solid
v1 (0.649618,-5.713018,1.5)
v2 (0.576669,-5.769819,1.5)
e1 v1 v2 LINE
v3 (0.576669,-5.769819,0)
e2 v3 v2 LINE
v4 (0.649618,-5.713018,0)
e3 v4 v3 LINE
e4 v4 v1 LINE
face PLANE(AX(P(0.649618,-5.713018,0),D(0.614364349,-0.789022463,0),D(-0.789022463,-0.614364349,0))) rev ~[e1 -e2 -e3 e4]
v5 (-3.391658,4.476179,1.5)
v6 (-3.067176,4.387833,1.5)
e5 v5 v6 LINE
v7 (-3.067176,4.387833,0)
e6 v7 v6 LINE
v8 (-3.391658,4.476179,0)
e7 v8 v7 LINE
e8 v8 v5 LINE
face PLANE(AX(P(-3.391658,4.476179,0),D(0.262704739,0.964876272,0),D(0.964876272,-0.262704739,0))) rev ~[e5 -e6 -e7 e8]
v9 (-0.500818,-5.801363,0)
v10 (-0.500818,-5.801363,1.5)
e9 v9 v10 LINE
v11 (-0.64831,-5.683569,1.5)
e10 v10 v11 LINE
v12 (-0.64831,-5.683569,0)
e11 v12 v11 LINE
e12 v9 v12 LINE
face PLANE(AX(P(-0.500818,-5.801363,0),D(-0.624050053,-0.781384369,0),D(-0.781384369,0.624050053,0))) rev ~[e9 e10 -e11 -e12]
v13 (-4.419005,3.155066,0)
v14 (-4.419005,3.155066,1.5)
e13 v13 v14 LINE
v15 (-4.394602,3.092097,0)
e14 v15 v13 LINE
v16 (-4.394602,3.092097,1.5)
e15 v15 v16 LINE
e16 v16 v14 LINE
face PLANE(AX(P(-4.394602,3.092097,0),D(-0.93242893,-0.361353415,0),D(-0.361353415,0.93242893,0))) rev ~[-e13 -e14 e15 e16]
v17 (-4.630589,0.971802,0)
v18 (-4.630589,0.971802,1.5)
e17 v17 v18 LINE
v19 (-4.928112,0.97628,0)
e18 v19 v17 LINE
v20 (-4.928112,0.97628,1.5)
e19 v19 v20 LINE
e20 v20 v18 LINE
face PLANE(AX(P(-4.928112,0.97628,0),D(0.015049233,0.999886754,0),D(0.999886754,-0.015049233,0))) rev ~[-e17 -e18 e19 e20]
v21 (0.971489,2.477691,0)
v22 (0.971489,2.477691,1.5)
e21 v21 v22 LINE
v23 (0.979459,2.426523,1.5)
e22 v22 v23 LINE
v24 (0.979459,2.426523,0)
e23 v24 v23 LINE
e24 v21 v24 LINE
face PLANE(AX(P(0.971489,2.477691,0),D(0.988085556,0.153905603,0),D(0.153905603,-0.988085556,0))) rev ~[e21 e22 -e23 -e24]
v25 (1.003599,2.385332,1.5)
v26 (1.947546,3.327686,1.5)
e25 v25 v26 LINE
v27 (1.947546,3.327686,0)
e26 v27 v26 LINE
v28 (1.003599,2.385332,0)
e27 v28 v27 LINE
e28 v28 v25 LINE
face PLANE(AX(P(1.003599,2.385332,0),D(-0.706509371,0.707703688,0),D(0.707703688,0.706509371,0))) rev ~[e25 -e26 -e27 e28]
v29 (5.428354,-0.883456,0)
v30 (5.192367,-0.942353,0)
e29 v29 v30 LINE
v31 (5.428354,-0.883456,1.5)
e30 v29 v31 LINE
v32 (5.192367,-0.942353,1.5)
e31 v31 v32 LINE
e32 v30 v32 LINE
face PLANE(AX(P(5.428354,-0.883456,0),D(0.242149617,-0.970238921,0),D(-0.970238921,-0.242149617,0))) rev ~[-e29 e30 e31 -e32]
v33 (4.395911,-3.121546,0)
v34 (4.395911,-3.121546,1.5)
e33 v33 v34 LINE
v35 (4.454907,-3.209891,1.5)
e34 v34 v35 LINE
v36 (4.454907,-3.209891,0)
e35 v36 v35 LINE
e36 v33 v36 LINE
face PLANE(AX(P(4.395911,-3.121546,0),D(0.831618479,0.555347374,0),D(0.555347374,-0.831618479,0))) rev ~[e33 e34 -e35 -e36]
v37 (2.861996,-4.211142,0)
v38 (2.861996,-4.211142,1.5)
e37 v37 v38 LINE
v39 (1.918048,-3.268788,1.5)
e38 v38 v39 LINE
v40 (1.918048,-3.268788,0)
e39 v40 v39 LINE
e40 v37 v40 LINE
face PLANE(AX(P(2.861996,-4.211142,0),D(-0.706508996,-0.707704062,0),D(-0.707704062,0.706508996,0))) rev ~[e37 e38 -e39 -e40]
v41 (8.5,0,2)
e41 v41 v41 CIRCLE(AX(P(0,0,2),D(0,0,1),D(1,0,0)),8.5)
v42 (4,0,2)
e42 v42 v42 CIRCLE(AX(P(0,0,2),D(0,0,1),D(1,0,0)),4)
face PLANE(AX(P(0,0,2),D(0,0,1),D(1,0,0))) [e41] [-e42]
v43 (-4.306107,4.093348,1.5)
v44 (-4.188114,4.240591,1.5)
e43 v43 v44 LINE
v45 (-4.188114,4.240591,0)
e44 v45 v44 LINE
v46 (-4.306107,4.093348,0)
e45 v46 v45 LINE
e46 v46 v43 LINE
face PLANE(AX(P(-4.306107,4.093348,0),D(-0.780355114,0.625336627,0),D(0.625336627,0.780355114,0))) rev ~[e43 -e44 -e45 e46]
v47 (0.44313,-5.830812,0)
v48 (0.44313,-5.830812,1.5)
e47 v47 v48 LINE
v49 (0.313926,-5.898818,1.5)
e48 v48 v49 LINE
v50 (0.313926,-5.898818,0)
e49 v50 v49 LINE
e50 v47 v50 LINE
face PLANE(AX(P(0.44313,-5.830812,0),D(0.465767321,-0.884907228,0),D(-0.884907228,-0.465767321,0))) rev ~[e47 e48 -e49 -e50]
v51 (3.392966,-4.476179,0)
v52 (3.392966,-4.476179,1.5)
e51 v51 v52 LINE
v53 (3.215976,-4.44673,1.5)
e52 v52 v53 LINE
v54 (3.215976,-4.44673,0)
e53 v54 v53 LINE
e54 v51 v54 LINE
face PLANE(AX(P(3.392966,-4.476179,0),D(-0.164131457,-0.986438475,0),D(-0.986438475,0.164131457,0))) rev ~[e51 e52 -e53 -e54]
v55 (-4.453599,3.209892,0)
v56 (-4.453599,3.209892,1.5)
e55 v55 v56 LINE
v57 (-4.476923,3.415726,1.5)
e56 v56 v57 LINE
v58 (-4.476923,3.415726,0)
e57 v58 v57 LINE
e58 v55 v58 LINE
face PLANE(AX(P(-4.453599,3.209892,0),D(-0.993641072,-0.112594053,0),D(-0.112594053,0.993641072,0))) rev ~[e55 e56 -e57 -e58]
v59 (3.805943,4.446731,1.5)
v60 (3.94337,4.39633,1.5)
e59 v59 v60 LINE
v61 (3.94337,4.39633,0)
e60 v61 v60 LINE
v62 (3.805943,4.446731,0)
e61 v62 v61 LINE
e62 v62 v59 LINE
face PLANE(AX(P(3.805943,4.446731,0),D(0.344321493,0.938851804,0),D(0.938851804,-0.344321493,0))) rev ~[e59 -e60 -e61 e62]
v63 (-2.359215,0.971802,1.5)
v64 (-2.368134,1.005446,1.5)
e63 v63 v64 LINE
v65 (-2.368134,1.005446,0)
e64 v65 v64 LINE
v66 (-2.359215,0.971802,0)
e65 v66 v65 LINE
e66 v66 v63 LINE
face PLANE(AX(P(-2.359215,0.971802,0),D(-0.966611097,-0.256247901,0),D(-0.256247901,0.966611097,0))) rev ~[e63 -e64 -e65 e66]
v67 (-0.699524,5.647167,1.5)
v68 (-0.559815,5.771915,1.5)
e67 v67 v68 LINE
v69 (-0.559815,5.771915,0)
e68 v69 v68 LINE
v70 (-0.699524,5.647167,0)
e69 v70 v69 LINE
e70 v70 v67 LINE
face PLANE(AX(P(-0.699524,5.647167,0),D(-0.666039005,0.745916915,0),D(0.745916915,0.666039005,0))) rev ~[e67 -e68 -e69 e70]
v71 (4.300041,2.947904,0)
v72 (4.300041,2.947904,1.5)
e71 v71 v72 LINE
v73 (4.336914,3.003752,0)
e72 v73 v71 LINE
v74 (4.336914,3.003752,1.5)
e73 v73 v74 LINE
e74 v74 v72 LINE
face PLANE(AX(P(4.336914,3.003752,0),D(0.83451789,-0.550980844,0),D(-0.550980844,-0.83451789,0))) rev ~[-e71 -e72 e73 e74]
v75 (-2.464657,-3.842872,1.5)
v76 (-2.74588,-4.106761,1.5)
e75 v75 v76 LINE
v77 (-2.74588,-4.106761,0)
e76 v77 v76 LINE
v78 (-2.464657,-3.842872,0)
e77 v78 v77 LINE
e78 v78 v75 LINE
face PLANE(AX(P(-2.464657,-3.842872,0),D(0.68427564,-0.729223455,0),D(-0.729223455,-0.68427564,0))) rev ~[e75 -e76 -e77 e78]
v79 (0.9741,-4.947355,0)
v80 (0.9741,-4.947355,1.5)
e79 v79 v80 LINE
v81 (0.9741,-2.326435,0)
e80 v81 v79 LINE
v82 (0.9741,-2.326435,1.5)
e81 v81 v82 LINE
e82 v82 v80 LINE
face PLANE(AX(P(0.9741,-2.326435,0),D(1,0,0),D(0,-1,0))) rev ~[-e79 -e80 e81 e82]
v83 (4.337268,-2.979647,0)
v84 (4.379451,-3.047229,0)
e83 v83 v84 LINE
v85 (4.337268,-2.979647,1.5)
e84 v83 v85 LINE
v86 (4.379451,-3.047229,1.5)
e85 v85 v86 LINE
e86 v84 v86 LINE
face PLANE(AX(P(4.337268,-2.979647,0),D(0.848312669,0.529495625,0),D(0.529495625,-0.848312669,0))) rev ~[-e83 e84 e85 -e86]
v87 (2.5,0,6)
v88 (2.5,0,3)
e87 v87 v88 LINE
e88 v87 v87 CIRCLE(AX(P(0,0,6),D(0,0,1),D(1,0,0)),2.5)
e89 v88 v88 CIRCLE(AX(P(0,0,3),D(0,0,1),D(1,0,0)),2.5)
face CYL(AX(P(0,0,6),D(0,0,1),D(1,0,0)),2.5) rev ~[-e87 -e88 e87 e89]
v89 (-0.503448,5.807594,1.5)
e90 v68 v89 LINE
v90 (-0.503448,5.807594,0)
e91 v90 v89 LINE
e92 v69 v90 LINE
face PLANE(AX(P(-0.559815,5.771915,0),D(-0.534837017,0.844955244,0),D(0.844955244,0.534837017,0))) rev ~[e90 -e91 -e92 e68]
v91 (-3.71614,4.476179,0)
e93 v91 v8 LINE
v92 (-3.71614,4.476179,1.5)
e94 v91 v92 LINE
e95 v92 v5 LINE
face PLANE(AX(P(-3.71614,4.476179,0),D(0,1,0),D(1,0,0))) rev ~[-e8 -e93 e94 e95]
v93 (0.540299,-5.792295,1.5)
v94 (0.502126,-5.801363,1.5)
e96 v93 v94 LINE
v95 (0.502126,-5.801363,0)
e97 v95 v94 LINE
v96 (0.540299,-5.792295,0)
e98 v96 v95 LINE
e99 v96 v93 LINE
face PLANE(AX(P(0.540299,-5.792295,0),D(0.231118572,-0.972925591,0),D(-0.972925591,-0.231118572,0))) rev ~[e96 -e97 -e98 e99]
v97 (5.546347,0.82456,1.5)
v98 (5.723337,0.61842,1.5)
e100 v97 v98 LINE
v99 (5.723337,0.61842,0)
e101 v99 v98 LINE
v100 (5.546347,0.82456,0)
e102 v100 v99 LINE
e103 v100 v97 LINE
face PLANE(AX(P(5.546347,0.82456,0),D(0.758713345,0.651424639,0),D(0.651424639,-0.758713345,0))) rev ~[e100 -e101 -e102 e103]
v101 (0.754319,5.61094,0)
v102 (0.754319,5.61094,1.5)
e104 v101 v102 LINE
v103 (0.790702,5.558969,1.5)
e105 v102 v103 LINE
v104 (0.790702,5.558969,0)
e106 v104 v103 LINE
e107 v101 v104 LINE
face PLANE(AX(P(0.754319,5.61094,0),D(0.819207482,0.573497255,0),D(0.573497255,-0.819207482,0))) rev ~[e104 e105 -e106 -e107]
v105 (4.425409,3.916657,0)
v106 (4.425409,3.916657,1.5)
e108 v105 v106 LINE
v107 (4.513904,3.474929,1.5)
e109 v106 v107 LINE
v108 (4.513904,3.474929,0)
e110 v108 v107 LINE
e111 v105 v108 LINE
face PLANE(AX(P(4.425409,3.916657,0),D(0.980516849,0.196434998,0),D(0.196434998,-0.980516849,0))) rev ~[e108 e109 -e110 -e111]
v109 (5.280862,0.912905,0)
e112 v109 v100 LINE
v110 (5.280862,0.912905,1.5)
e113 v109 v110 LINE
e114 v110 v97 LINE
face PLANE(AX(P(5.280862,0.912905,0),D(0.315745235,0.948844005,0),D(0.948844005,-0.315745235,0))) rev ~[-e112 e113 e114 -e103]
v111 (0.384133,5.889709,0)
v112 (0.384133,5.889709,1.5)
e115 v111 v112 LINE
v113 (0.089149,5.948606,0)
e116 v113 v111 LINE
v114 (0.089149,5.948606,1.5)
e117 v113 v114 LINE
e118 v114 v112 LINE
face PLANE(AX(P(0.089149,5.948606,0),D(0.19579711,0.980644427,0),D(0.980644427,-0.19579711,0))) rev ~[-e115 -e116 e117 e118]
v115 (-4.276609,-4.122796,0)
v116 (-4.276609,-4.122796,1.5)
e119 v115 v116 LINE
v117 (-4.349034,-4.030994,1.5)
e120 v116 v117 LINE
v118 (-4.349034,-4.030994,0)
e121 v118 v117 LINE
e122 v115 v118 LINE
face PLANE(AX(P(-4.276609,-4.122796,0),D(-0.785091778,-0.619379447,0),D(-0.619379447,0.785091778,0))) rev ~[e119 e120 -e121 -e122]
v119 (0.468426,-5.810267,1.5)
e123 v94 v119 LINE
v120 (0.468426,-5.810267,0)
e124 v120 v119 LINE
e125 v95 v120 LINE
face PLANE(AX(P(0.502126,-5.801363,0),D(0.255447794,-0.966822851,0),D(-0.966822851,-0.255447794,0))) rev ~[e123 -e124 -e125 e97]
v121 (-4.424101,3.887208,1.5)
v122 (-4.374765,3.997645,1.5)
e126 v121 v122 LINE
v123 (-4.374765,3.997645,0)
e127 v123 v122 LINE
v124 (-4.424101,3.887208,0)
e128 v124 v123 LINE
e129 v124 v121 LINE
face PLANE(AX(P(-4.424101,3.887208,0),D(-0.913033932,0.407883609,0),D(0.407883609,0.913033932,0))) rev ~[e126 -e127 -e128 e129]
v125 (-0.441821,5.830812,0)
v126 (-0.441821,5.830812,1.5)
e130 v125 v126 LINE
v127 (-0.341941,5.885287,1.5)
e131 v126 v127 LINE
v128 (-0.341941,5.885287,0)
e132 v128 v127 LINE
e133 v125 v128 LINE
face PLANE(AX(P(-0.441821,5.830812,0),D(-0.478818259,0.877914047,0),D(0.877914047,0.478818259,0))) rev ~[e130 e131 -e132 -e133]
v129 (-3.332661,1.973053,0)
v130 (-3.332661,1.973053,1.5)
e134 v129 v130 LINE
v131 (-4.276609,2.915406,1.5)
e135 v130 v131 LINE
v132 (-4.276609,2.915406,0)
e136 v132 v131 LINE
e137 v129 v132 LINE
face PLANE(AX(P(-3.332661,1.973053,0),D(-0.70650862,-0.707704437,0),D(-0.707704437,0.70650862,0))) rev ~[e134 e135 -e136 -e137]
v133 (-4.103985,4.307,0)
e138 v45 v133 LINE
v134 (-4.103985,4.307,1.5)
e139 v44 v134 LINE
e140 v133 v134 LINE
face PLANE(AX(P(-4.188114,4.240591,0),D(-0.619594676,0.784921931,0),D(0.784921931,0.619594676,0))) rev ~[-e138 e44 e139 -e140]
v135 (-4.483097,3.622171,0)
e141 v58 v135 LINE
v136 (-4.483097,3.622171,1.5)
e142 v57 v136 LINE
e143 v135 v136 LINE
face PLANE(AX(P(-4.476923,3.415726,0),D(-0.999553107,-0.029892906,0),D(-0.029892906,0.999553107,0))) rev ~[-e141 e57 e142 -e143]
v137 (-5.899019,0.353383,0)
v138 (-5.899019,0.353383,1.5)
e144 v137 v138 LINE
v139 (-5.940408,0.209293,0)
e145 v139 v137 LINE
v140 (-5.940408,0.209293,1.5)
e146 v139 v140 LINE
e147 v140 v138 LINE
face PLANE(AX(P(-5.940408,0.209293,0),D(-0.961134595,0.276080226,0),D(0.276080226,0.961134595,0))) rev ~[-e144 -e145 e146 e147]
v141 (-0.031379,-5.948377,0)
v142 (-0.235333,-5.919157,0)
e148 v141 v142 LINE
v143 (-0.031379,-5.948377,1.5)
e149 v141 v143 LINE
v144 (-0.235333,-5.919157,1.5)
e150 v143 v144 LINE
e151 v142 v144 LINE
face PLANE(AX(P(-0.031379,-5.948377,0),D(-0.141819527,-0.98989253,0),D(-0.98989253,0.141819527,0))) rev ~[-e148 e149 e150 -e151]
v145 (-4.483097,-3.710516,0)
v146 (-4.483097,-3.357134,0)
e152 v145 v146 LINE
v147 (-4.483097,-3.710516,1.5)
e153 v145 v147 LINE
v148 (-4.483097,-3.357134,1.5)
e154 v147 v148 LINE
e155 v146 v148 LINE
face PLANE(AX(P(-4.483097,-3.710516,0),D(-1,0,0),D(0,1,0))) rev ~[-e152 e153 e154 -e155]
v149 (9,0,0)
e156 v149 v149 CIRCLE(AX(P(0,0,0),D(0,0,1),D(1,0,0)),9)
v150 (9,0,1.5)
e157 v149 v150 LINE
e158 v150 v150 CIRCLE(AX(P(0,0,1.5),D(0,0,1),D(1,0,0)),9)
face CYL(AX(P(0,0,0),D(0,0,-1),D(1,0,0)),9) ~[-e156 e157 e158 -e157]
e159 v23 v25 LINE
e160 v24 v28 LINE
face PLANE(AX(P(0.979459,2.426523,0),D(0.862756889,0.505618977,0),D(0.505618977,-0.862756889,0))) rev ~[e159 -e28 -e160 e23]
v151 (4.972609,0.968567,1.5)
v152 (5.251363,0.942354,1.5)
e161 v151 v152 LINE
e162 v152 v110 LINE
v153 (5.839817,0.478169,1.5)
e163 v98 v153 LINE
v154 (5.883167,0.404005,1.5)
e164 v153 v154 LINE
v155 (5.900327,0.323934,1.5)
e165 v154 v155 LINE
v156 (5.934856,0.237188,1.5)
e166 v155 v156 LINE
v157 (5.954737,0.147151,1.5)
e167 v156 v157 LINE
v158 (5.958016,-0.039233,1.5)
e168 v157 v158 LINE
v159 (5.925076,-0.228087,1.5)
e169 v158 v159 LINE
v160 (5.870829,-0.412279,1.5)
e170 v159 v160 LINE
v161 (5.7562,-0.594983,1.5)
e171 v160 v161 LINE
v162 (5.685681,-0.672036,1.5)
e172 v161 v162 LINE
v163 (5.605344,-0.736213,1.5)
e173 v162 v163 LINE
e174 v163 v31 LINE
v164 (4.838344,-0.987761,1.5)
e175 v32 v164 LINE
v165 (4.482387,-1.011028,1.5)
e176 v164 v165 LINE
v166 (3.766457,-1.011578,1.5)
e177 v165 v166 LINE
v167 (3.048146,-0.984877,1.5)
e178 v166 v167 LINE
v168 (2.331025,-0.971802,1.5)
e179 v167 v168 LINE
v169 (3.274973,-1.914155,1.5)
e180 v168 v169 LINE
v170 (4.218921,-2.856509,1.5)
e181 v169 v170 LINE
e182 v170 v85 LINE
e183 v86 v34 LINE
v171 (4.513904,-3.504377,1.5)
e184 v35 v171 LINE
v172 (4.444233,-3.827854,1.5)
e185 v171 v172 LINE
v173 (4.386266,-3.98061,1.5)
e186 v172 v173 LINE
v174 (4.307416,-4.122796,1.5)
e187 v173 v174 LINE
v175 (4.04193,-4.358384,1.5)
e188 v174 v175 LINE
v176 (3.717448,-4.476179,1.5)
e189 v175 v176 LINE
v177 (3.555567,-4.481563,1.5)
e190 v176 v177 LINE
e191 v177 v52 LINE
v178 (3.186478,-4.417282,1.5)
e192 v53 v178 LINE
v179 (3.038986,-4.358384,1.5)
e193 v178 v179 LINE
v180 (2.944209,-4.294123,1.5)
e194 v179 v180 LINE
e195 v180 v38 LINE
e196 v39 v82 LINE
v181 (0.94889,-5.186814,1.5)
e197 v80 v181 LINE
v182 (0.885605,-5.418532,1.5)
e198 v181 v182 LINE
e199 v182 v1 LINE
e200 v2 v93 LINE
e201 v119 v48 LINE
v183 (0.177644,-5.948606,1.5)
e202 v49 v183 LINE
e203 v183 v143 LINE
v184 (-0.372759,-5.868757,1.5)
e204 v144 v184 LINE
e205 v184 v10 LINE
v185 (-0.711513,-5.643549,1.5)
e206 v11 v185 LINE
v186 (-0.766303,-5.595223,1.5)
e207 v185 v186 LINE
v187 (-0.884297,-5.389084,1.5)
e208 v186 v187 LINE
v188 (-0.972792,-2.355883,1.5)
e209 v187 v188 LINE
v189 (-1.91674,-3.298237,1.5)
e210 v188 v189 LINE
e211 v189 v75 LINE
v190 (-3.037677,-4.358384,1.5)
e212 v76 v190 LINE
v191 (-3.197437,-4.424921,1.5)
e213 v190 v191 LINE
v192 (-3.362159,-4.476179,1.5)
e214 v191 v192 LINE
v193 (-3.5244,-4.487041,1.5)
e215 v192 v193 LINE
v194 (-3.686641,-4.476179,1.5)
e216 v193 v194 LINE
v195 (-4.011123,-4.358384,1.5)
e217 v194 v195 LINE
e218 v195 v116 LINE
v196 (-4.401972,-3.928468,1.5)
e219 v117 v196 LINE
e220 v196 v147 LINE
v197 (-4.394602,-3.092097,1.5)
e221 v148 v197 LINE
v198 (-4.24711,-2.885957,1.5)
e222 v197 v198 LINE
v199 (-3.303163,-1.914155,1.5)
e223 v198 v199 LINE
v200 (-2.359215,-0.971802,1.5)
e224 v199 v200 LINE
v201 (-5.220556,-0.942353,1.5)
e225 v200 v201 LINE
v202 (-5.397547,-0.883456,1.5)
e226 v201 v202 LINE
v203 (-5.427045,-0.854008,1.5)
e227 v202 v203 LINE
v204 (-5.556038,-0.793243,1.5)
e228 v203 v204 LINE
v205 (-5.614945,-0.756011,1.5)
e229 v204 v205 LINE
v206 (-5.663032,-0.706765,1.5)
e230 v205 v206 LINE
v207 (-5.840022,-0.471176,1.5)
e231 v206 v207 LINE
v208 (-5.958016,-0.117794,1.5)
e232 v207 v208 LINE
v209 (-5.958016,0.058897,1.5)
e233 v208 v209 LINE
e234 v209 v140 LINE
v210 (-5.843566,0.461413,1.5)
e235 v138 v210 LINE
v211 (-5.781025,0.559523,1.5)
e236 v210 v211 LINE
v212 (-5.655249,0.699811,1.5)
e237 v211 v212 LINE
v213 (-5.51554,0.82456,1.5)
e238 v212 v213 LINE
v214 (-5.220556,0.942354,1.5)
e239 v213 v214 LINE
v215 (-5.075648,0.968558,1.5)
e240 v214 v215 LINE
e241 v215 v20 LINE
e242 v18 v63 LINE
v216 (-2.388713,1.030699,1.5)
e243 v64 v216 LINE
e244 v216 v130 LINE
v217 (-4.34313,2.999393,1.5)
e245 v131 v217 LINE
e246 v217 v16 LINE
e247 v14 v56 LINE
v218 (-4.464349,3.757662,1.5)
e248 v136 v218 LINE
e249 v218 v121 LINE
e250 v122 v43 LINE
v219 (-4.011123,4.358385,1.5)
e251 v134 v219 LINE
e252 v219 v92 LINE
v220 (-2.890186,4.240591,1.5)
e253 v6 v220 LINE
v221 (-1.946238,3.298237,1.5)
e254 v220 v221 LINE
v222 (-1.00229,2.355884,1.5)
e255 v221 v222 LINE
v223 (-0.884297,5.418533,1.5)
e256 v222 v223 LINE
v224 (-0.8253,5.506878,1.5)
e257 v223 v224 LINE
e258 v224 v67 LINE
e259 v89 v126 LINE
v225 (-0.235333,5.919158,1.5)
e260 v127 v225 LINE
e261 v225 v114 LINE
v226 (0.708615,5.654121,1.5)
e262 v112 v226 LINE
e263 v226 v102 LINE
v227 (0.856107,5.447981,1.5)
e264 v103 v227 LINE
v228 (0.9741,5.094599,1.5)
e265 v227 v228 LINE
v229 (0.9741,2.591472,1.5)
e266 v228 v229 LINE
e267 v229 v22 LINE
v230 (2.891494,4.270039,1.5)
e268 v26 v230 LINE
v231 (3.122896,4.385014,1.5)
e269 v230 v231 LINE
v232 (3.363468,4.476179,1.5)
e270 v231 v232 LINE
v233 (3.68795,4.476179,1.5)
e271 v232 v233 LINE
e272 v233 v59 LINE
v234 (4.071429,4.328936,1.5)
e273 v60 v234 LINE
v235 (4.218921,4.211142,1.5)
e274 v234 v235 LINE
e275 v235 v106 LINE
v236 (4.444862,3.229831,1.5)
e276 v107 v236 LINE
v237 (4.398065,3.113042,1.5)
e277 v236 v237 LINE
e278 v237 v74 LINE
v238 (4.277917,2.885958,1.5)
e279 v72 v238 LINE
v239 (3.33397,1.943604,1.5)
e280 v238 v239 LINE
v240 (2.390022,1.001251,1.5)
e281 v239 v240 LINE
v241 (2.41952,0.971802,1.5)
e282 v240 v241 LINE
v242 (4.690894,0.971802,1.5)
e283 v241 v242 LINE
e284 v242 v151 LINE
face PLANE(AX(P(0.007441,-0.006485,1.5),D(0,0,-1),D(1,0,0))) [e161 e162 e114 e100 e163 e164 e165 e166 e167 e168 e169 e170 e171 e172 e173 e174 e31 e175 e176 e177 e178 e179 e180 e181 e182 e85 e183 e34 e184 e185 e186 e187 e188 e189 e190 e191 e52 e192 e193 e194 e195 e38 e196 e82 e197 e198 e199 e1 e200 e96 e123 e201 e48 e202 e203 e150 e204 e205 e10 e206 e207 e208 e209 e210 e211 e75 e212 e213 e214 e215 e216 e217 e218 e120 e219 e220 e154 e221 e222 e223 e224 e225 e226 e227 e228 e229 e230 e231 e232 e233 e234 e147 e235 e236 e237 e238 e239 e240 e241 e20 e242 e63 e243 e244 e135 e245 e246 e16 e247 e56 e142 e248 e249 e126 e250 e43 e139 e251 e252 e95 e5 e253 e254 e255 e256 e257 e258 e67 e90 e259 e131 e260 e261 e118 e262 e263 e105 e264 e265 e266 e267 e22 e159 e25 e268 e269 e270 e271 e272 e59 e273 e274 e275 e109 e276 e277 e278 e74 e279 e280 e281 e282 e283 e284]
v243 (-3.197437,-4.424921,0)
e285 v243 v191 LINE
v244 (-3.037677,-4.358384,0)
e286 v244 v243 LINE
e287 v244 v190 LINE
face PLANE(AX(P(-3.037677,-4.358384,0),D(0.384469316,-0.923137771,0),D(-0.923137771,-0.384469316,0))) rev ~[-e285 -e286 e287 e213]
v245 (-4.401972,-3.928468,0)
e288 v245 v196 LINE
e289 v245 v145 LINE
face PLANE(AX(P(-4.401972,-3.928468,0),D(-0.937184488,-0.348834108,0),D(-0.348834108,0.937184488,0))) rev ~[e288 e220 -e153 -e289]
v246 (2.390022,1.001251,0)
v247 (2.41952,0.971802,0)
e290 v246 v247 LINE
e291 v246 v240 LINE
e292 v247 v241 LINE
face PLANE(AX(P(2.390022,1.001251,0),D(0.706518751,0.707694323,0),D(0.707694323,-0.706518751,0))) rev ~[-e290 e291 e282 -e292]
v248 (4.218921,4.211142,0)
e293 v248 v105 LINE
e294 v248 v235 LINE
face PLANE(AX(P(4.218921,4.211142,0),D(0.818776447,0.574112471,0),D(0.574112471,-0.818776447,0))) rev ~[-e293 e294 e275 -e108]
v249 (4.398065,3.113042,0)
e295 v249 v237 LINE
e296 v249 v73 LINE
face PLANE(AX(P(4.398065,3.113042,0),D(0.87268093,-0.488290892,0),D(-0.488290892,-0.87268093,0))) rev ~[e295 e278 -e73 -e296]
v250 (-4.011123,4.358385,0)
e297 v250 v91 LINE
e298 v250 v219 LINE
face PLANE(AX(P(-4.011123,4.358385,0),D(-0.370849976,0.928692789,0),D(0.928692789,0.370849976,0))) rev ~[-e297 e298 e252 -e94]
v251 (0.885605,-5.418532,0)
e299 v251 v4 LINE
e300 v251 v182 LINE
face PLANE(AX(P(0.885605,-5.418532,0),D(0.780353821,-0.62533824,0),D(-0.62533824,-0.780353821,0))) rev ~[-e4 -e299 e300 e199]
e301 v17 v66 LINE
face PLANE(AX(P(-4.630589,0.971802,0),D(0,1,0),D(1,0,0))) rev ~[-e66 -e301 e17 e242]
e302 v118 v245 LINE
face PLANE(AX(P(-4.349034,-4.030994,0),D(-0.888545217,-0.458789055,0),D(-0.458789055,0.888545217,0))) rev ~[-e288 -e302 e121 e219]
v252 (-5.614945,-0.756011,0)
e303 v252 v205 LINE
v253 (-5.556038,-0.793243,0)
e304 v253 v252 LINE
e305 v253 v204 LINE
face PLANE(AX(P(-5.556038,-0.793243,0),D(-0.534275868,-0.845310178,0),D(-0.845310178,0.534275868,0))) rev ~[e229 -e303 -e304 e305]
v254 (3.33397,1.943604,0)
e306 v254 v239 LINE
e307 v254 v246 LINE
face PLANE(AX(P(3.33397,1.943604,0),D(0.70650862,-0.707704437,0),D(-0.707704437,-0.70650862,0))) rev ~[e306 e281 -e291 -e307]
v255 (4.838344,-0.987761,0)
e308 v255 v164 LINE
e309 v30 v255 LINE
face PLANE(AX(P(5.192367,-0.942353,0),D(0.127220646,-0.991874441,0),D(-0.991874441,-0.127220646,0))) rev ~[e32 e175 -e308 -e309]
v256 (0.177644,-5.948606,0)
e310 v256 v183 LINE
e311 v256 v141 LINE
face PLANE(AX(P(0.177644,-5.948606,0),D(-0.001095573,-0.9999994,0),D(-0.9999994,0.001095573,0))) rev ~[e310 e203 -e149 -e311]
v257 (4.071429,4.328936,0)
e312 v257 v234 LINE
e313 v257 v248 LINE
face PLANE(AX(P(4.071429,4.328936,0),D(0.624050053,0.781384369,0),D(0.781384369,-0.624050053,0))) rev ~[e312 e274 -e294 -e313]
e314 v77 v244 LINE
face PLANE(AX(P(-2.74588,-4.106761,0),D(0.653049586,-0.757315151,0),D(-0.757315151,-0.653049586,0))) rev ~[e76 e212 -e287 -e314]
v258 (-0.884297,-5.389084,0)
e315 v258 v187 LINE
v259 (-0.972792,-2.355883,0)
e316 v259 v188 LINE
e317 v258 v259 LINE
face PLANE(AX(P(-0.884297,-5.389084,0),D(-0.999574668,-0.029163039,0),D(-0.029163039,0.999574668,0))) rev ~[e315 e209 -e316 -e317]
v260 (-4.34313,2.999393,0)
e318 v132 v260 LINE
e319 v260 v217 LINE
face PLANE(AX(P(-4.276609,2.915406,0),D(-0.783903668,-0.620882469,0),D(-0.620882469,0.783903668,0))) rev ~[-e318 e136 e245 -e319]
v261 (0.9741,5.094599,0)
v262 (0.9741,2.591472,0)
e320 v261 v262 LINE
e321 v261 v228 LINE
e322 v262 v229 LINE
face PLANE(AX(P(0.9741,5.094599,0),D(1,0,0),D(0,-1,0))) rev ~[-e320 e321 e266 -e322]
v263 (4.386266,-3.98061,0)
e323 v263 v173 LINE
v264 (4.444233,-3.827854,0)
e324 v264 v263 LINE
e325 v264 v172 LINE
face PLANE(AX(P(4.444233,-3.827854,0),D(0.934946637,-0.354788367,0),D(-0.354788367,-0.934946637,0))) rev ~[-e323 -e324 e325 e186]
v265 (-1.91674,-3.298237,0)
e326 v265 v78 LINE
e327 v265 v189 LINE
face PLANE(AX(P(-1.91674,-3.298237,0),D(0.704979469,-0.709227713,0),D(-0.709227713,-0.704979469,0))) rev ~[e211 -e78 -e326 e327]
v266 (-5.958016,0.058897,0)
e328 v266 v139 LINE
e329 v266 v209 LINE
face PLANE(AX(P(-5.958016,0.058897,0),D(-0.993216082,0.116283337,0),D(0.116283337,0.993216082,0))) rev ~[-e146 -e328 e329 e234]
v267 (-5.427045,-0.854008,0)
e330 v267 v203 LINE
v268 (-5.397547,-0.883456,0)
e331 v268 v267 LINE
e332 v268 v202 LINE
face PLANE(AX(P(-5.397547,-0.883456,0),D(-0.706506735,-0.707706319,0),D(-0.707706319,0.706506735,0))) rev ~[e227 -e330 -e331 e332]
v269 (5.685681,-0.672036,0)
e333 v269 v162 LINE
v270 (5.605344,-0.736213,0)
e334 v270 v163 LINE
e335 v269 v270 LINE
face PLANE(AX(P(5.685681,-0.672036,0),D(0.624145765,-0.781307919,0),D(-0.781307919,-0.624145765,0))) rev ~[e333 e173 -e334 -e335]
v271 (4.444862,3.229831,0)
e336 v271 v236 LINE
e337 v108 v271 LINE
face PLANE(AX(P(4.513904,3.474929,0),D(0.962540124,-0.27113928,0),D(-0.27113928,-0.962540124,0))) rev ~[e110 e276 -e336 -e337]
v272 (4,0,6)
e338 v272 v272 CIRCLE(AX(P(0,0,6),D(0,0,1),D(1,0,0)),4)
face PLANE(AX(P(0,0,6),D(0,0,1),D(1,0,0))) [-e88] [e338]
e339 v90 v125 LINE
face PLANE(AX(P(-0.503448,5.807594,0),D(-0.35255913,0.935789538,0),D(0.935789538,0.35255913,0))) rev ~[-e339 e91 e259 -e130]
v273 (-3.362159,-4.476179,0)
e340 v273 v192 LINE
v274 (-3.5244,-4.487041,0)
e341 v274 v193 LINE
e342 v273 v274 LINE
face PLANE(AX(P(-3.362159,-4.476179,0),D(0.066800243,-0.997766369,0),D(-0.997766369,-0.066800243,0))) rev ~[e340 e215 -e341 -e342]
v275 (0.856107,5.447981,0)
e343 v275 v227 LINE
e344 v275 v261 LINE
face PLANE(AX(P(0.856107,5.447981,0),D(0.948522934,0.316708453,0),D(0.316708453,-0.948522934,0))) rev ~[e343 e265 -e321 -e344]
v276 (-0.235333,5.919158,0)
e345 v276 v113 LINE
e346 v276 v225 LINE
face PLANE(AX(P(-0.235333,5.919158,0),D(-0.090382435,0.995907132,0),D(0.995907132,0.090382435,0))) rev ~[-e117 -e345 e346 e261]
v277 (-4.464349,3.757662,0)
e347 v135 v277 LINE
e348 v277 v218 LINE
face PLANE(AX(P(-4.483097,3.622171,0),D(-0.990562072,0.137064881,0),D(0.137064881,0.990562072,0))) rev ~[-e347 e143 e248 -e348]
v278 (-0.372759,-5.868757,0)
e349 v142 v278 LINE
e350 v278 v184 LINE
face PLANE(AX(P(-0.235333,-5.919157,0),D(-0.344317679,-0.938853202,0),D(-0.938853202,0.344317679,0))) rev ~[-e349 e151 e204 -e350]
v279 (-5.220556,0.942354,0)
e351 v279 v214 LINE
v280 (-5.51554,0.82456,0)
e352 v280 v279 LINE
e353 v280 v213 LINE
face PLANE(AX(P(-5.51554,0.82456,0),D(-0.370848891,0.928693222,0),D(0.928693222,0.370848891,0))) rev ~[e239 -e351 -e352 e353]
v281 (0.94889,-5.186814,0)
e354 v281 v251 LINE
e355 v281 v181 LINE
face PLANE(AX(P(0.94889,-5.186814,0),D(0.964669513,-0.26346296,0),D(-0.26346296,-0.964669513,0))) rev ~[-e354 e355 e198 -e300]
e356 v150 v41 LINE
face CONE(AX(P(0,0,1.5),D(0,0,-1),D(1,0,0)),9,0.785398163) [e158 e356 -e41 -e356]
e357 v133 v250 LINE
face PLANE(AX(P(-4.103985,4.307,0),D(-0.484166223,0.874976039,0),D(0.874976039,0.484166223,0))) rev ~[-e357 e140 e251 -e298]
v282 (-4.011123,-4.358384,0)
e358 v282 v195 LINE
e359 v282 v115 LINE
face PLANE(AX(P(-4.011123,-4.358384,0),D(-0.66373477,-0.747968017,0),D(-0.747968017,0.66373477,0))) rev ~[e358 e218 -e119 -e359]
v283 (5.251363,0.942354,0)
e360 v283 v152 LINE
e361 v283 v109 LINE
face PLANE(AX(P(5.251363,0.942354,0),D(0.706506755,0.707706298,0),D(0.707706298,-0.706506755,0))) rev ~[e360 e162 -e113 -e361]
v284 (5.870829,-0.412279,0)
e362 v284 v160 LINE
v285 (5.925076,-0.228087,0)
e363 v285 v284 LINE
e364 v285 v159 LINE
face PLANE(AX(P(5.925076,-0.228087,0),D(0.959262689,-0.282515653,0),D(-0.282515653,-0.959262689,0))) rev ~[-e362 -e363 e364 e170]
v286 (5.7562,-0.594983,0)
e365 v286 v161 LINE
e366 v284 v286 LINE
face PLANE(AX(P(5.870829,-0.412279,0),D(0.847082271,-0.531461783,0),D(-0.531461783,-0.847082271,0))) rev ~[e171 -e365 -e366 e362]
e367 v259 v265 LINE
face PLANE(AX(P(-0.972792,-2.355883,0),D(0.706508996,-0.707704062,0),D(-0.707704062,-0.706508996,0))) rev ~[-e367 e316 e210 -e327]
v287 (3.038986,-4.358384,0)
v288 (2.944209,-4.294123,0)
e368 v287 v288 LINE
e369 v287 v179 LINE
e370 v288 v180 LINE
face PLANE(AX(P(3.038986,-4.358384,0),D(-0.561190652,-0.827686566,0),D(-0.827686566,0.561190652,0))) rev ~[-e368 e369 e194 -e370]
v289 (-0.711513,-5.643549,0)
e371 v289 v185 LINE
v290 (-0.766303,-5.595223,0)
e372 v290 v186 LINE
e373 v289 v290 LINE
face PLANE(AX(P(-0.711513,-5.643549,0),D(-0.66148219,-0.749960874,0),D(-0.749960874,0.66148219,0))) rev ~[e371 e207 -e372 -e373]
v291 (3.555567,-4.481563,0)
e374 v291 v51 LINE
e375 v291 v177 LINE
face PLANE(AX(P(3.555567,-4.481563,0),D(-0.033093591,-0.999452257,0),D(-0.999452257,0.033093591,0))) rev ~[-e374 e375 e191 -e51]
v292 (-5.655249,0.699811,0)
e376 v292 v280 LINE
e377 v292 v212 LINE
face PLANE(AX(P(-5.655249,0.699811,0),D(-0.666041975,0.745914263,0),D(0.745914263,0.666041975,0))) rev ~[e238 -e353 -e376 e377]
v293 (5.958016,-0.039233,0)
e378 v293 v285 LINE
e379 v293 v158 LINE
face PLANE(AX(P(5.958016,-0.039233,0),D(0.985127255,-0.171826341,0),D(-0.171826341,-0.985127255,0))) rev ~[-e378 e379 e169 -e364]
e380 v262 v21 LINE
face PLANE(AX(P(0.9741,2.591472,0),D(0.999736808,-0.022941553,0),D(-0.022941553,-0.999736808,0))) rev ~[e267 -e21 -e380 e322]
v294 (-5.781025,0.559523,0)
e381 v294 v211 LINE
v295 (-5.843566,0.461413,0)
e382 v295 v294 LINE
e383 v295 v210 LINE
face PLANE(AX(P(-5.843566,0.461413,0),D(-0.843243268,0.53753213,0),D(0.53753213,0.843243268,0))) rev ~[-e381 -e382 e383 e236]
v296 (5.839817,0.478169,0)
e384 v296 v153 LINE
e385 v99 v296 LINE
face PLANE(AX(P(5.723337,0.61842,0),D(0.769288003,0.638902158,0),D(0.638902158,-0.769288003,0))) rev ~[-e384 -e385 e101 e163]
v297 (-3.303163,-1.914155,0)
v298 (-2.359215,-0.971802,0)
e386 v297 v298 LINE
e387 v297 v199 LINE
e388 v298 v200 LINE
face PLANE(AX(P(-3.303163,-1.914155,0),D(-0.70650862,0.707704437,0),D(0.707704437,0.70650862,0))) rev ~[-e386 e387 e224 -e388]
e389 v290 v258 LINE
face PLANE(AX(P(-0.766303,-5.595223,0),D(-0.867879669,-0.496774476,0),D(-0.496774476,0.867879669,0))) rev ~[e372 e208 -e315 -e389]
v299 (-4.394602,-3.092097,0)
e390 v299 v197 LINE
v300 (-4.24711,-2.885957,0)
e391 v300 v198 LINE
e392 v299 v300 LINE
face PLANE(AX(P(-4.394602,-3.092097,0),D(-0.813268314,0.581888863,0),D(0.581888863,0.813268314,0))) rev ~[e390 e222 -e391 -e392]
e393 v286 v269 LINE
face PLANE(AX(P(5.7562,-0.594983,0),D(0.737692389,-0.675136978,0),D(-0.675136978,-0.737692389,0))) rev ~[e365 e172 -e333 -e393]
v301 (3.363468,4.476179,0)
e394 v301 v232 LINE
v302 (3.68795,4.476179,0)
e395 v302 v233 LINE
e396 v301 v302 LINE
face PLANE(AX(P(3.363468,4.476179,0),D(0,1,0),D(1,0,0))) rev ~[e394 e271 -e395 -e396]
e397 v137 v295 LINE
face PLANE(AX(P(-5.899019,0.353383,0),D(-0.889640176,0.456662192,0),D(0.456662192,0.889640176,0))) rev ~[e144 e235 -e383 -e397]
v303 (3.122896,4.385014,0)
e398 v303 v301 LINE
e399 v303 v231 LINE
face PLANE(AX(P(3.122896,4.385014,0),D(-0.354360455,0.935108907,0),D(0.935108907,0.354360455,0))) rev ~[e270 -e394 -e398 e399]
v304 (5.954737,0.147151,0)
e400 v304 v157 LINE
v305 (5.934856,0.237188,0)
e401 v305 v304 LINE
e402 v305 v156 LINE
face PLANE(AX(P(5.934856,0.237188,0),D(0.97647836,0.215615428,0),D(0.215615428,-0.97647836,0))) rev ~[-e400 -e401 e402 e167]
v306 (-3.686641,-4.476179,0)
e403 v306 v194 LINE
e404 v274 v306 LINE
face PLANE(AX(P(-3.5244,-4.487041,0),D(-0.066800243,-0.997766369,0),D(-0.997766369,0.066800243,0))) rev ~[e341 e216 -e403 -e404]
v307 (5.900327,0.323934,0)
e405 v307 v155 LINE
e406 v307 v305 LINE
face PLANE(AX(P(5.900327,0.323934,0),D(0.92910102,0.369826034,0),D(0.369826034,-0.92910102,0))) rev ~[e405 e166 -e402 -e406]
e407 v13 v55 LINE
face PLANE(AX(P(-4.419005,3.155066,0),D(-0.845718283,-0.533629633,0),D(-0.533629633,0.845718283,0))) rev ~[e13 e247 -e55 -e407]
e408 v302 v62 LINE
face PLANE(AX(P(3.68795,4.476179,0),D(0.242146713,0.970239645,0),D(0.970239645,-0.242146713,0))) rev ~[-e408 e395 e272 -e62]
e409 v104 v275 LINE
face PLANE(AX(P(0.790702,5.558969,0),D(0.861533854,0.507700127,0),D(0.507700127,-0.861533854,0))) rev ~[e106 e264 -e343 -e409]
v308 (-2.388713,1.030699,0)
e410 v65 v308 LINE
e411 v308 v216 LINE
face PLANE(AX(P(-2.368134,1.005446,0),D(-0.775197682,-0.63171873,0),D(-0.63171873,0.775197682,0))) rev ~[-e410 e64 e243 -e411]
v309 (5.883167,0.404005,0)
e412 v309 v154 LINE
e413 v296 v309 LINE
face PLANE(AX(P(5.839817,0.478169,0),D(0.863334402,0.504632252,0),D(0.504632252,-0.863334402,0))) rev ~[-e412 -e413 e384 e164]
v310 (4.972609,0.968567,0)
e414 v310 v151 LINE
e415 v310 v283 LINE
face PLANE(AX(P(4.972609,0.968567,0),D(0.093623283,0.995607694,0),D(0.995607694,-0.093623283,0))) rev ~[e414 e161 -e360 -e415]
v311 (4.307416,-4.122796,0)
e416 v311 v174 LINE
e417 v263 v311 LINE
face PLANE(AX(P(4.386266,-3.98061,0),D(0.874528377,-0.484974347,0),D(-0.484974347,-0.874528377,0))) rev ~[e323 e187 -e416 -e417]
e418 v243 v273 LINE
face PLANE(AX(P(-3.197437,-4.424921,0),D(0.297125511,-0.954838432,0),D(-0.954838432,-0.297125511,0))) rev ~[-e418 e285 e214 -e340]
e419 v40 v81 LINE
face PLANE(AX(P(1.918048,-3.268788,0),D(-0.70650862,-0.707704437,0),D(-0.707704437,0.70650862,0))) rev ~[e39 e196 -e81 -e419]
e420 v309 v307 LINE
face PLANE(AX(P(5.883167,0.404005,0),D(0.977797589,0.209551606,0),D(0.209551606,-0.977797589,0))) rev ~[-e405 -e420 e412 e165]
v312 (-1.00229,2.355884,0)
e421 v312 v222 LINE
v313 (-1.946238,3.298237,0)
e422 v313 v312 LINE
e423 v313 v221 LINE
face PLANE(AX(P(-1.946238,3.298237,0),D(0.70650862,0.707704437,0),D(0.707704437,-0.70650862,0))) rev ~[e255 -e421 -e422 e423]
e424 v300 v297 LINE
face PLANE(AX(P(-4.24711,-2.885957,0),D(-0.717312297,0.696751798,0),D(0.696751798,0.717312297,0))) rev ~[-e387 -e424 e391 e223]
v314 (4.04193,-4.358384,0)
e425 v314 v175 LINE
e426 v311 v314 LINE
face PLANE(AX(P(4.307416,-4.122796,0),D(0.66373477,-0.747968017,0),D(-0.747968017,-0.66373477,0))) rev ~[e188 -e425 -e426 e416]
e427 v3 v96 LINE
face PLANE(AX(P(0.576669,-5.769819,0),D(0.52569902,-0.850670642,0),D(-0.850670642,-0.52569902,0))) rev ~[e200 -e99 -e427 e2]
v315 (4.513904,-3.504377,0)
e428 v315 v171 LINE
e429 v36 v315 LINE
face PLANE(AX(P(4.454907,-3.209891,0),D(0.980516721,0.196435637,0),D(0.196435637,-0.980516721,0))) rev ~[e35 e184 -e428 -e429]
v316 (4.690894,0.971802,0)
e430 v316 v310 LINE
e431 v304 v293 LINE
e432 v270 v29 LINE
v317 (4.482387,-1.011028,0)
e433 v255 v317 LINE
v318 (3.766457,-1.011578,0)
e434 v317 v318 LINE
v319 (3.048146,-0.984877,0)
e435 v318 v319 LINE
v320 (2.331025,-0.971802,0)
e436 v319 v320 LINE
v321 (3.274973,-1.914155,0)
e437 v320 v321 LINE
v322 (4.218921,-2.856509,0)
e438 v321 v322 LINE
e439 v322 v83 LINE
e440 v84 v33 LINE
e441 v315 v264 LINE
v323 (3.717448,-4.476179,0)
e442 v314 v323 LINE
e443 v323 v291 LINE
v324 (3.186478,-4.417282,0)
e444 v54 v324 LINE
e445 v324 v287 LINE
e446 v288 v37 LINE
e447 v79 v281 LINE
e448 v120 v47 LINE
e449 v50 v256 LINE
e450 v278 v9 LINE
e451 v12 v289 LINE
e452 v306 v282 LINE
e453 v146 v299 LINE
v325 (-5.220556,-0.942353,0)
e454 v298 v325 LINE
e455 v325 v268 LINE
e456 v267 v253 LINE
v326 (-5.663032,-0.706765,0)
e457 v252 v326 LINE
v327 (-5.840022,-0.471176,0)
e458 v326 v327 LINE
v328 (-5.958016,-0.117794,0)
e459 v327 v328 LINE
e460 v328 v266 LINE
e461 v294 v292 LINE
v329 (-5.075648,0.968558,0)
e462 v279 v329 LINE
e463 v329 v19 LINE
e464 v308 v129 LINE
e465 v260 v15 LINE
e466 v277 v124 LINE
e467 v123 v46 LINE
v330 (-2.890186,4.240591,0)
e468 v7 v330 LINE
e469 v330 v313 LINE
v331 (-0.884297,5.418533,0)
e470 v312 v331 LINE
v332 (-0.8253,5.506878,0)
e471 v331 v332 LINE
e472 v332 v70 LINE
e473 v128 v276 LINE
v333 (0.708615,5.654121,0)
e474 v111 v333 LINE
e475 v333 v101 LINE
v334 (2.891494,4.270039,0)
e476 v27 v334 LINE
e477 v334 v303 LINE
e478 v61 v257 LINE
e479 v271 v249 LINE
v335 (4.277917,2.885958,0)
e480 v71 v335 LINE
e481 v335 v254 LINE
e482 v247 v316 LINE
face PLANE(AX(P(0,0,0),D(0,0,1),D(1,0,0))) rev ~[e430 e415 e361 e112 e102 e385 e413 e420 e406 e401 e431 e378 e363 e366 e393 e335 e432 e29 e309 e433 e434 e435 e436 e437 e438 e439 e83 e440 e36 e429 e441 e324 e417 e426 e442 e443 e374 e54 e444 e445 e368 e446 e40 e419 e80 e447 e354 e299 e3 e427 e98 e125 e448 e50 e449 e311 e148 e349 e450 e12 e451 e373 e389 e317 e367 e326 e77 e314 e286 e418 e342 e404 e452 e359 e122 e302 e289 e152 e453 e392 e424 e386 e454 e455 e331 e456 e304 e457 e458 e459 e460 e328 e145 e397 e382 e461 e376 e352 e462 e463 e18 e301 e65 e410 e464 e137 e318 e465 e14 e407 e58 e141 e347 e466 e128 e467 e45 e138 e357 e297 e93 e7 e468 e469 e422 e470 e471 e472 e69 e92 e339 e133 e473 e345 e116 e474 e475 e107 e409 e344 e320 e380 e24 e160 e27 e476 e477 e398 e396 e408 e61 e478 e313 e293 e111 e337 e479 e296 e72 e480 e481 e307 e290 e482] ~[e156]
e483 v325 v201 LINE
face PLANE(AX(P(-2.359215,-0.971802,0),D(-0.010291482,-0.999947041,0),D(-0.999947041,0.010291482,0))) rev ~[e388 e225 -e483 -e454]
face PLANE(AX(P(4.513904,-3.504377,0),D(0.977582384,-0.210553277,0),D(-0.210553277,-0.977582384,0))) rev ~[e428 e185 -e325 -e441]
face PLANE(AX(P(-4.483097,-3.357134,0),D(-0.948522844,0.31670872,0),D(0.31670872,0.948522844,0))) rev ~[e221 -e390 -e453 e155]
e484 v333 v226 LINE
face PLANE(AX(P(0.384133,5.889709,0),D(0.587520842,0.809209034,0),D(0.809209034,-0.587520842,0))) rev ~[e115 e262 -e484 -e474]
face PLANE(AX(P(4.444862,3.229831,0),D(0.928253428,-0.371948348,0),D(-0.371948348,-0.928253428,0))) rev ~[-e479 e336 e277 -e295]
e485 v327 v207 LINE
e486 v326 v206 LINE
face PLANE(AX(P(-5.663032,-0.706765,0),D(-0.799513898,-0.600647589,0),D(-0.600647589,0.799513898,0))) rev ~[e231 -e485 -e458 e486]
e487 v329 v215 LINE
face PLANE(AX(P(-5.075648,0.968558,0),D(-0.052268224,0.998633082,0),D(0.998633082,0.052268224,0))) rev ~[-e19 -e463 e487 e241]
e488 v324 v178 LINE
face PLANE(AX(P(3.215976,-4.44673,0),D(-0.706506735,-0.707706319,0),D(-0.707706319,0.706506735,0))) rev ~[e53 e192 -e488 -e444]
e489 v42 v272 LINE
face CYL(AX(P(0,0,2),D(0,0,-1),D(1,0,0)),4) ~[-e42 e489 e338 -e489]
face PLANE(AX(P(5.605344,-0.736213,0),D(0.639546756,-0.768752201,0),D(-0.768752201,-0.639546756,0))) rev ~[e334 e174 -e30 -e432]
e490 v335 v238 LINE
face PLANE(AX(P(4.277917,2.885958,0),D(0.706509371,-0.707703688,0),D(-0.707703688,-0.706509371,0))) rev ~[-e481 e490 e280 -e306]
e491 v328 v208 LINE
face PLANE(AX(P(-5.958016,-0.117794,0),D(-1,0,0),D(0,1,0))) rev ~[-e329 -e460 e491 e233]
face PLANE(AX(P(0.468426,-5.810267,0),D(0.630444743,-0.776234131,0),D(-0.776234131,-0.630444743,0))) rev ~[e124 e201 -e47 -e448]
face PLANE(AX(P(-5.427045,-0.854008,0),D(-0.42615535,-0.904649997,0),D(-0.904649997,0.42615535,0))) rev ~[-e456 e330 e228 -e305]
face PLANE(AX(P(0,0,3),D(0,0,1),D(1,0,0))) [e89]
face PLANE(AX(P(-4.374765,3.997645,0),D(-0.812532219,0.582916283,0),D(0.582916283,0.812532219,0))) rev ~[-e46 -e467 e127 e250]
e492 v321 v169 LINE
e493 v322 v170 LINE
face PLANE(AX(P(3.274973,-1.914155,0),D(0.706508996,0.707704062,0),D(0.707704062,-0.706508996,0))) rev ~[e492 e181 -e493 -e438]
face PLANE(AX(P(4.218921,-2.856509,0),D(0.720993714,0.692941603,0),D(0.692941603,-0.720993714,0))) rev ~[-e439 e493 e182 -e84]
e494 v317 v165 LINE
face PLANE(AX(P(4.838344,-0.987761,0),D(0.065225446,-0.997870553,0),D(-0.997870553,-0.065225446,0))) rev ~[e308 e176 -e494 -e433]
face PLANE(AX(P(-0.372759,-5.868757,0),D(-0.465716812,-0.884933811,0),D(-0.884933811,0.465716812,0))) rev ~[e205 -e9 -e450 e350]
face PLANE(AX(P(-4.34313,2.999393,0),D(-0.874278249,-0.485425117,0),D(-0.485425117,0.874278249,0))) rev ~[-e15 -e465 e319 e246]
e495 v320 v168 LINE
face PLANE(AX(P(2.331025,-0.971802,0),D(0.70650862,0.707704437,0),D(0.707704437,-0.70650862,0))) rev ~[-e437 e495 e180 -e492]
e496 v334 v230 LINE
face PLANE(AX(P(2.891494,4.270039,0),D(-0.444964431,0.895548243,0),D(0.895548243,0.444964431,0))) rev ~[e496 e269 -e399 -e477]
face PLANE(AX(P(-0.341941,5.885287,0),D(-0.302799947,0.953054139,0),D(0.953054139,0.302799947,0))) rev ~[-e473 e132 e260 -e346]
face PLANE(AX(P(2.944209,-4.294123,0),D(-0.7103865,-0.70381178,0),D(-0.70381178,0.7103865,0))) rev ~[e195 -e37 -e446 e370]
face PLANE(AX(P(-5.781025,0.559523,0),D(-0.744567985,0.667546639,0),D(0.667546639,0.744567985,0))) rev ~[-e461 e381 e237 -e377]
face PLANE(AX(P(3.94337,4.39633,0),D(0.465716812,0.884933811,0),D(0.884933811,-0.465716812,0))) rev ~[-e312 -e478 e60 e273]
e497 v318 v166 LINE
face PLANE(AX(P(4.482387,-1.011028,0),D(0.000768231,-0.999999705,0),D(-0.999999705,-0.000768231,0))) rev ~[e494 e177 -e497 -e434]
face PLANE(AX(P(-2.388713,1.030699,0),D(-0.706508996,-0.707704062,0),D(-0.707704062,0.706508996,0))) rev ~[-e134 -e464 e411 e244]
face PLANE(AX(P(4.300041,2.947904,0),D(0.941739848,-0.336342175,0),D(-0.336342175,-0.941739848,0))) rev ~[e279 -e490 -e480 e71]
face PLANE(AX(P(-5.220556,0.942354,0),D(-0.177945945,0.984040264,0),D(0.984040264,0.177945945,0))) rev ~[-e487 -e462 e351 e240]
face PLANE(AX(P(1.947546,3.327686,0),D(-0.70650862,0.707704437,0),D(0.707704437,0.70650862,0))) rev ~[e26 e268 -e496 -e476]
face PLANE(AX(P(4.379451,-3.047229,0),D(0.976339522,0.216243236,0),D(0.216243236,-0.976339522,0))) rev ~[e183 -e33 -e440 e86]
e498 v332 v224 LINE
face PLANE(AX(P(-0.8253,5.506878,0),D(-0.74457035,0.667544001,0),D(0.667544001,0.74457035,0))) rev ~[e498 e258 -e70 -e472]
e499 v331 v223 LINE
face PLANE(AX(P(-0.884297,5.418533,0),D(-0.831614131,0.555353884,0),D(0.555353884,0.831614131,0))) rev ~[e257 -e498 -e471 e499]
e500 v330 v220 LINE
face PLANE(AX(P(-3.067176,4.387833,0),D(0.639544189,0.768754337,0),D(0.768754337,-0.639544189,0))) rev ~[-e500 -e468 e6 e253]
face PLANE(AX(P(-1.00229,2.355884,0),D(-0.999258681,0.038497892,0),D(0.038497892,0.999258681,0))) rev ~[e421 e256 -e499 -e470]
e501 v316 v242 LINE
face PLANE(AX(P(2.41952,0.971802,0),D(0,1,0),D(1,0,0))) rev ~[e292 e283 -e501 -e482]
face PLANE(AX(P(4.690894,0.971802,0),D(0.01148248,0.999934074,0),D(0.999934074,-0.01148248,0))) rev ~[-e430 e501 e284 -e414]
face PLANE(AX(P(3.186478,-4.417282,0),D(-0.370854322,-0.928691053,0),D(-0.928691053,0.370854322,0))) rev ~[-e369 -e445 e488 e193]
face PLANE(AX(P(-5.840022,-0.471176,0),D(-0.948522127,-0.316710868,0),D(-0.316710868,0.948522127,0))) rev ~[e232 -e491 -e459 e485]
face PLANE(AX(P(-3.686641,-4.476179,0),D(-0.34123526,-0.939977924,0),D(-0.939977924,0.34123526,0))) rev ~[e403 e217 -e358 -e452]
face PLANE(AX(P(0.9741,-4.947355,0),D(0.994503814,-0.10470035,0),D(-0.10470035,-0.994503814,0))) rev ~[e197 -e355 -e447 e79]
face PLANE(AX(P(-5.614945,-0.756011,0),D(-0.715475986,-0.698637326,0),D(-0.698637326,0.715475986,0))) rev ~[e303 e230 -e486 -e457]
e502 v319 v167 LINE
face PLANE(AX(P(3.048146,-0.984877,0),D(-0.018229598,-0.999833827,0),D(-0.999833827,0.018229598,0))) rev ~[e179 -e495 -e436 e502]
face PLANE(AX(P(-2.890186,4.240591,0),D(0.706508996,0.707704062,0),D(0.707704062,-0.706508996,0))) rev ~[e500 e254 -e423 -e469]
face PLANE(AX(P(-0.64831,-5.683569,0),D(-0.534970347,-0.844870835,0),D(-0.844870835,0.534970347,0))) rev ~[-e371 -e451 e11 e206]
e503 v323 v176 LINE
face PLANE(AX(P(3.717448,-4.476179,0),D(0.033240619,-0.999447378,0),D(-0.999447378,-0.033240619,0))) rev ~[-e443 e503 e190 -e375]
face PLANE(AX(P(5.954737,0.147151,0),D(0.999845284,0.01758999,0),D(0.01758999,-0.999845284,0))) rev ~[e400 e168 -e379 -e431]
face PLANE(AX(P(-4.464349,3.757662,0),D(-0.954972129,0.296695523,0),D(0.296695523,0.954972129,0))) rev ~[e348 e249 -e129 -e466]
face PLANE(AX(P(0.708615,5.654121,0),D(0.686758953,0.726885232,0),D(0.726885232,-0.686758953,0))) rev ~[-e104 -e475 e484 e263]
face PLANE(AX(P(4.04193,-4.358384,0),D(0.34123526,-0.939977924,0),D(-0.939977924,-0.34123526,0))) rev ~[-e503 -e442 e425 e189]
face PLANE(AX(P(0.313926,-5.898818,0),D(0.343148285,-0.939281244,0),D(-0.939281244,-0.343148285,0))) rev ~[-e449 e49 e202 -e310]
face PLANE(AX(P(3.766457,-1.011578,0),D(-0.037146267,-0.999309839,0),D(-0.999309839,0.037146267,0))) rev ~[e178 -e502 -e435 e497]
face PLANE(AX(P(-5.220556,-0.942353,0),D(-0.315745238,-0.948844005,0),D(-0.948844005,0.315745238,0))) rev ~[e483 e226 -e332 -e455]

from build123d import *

# Parameters (mm, degrees)
F0_R     = 9
F1_DEPTH = 2
F2_R     = 4
F3_DEPTH = 4
F4_R     = 2.5
F5_DEPTH = 3
F6_SIZE  = 0.5
F8_DEPTH = 1.5


with BuildPart() as f1:
    # F0 (on Top) → F1 (new body)
    with BuildSketch(Plane.XY):
        Circle(F0_R)
    extrude(amount=F1_DEPTH)

    # F2 (on face) → F3 (join)
    with BuildSketch(Plane.XY.offset(2)):
        Circle(F2_R)
    extrude(amount=F3_DEPTH)

    # F4 (on face) → F5 (cut)
    with BuildSketch(Plane.XY.offset(6)):
        Circle(F4_R)
    extrude(amount=-F5_DEPTH, mode=Mode.SUBTRACT)

    # F6
    f6_edges = [f1.edges().sort_by_distance(p)[0] for p in [
        (-9, 0, 2),
    ]]
    chamfer(f6_edges, length=F6_SIZE)

    # F7 (on face) → F8 (cut)
    with BuildSketch(Plane(origin=(0, 0, 0), x_dir=(1, 0, 0), z_dir=(0, 0, -1))):
        Polygon((-0.031379, 5.948377), (-0.235333, 5.919157), (-0.372759, 5.868757), (-0.500818, 5.801363), (-0.64831, 5.683569), (-0.711513, 5.643549), (-0.766303, 5.595223), (-0.884297, 5.389084), (-0.972792, 2.355883), (-1.91674, 3.298237), (-2.464657, 3.842872), (-2.74588, 4.106761), (-3.037677, 4.358384), (-3.197437, 4.424921), (-3.362159, 4.476179), (-3.5244, 4.487041), (-3.686641, 4.476179), (-4.011123, 4.358384), (-4.276609, 4.122796), (-4.349034, 4.030994), (-4.401972, 3.928468), (-4.483097, 3.710516), (-4.483097, 3.357134), (-4.394602, 3.092097), (-4.24711, 2.885957), (-3.303163, 1.914155), (-2.359215, 0.971802), (-5.220556, 0.942353), (-5.397547, 0.883456), (-5.427045, 0.854008), (-5.556038, 0.793243), (-5.614945, 0.756011), (-5.663032, 0.706765), (-5.840022, 0.471176), (-5.958016, 0.117794), (-5.958016, -0.058897), (-5.940408, -0.209293), (-5.899019, -0.353383), (-5.843566, -0.461413), (-5.781025, -0.559523), (-5.655249, -0.699811), (-5.51554, -0.82456), (-5.220556, -0.942354), (-5.075648, -0.968558), (-4.928112, -0.97628), (-4.630589, -0.971802), (-4.188114, -0.971802), (-2.359215, -0.971802), (-2.368134, -1.005446), (-2.388713, -1.030699), (-3.332661, -1.973053), (-4.276609, -2.915406), (-4.34313, -2.999393), (-4.394602, -3.092097), (-4.419005, -3.155066), (-4.453599, -3.209892), (-4.476923, -3.415726), (-4.483097, -3.622171), (-4.464349, -3.757662), (-4.424101, -3.887208), (-4.374765, -3.997645), (-4.306107, -4.093348), (-4.188114, -4.240591), (-4.103985, -4.307), (-4.011123, -4.358385), (-3.71614, -4.476179), (-3.391658, -4.476179), (-3.067176, -4.387833), (-2.890186, -4.240591), (-1.946238, -3.298237), (-1.00229, -2.355884), (-0.884297, -5.418533), (-0.8253, -5.506878), (-0.699524, -5.647167), (-0.559815, -5.771915), (-0.503448, -5.807594), (-0.441821, -5.830812), (-0.341941, -5.885287), (-0.235333, -5.919158), (0.089149, -5.948606), (0.384133, -5.889709), (0.708615, -5.654121), (0.754319, -5.61094), (0.790702, -5.558969), (0.856107, -5.447981), (0.9741, -5.094599), (0.9741, -4.417282), (0.9741, -2.591472), (0.971489, -2.477691), (0.979459, -2.426523), (1.003599, -2.385332), (1.947546, -3.327686), (2.891494, -4.270039), (3.122896, -4.385014), (3.363468, -4.476179), (3.68795, -4.476179), (3.805943, -4.446731), (3.94337, -4.39633), (4.071429, -4.328936), (4.218921, -4.211142), (4.425409, -3.916657), (4.513904, -3.474929), (4.444862, -3.229831), (4.398065, -3.113042), (4.336914, -3.003752), (4.300041, -2.947904), (4.277917, -2.885958), (3.33397, -1.943604), (2.390022, -1.001251), (2.41952, -0.971802), (2.861996, -0.971802), (4.690894, -0.971802), (4.972609, -0.968567), (5.251363, -0.942354), (5.280862, -0.912905), (5.546347, -0.82456), (5.723337, -0.61842), (5.839817, -0.478169), (5.883167, -0.404005), (5.900327, -0.323934), (5.934856, -0.237188), (5.954737, -0.147151), (5.958016, 0.039233), (5.925076, 0.228087), (5.870829, 0.412279), (5.7562, 0.594983), (5.685681, 0.672036), (5.605344, 0.736213), (5.428354, 0.883456), (5.192367, 0.942353), (4.838344, 0.987761), (4.482387, 1.011028), (3.766457, 1.011578), (3.048146, 0.984877), (2.331025, 0.971802), (3.274973, 1.914155), (4.218921, 2.856509), (4.337268, 2.979647), (4.379451, 3.047229), (4.395911, 3.121546), (4.454907, 3.209891), (4.513904, 3.504377), (4.444233, 3.827854), (4.386266, 3.98061), (4.307416, 4.122796), (4.04193, 4.358384), (3.717448, 4.476179), (3.555567, 4.481563), (3.392966, 4.476179), (3.215976, 4.44673), (3.186478, 4.417282), (3.038986, 4.358384), (2.944209, 4.294123), (2.861996, 4.211142), (1.918048, 3.268788), (0.9741, 2.326435), (0.9741, 3.092097), (0.9741, 4.947355), (0.94889, 5.186814), (0.885605, 5.418532), (0.649618, 5.713018), (0.576669, 5.769819), (0.540299, 5.792295), (0.502126, 5.801363), (0.468426, 5.810267), (0.44313, 5.830812), (0.313926, 5.898818), (0.177644, 5.948606), align=None)
    extrude(amount=-F8_DEPTH, mode=Mode.SUBTRACT)


solid = f1.part
